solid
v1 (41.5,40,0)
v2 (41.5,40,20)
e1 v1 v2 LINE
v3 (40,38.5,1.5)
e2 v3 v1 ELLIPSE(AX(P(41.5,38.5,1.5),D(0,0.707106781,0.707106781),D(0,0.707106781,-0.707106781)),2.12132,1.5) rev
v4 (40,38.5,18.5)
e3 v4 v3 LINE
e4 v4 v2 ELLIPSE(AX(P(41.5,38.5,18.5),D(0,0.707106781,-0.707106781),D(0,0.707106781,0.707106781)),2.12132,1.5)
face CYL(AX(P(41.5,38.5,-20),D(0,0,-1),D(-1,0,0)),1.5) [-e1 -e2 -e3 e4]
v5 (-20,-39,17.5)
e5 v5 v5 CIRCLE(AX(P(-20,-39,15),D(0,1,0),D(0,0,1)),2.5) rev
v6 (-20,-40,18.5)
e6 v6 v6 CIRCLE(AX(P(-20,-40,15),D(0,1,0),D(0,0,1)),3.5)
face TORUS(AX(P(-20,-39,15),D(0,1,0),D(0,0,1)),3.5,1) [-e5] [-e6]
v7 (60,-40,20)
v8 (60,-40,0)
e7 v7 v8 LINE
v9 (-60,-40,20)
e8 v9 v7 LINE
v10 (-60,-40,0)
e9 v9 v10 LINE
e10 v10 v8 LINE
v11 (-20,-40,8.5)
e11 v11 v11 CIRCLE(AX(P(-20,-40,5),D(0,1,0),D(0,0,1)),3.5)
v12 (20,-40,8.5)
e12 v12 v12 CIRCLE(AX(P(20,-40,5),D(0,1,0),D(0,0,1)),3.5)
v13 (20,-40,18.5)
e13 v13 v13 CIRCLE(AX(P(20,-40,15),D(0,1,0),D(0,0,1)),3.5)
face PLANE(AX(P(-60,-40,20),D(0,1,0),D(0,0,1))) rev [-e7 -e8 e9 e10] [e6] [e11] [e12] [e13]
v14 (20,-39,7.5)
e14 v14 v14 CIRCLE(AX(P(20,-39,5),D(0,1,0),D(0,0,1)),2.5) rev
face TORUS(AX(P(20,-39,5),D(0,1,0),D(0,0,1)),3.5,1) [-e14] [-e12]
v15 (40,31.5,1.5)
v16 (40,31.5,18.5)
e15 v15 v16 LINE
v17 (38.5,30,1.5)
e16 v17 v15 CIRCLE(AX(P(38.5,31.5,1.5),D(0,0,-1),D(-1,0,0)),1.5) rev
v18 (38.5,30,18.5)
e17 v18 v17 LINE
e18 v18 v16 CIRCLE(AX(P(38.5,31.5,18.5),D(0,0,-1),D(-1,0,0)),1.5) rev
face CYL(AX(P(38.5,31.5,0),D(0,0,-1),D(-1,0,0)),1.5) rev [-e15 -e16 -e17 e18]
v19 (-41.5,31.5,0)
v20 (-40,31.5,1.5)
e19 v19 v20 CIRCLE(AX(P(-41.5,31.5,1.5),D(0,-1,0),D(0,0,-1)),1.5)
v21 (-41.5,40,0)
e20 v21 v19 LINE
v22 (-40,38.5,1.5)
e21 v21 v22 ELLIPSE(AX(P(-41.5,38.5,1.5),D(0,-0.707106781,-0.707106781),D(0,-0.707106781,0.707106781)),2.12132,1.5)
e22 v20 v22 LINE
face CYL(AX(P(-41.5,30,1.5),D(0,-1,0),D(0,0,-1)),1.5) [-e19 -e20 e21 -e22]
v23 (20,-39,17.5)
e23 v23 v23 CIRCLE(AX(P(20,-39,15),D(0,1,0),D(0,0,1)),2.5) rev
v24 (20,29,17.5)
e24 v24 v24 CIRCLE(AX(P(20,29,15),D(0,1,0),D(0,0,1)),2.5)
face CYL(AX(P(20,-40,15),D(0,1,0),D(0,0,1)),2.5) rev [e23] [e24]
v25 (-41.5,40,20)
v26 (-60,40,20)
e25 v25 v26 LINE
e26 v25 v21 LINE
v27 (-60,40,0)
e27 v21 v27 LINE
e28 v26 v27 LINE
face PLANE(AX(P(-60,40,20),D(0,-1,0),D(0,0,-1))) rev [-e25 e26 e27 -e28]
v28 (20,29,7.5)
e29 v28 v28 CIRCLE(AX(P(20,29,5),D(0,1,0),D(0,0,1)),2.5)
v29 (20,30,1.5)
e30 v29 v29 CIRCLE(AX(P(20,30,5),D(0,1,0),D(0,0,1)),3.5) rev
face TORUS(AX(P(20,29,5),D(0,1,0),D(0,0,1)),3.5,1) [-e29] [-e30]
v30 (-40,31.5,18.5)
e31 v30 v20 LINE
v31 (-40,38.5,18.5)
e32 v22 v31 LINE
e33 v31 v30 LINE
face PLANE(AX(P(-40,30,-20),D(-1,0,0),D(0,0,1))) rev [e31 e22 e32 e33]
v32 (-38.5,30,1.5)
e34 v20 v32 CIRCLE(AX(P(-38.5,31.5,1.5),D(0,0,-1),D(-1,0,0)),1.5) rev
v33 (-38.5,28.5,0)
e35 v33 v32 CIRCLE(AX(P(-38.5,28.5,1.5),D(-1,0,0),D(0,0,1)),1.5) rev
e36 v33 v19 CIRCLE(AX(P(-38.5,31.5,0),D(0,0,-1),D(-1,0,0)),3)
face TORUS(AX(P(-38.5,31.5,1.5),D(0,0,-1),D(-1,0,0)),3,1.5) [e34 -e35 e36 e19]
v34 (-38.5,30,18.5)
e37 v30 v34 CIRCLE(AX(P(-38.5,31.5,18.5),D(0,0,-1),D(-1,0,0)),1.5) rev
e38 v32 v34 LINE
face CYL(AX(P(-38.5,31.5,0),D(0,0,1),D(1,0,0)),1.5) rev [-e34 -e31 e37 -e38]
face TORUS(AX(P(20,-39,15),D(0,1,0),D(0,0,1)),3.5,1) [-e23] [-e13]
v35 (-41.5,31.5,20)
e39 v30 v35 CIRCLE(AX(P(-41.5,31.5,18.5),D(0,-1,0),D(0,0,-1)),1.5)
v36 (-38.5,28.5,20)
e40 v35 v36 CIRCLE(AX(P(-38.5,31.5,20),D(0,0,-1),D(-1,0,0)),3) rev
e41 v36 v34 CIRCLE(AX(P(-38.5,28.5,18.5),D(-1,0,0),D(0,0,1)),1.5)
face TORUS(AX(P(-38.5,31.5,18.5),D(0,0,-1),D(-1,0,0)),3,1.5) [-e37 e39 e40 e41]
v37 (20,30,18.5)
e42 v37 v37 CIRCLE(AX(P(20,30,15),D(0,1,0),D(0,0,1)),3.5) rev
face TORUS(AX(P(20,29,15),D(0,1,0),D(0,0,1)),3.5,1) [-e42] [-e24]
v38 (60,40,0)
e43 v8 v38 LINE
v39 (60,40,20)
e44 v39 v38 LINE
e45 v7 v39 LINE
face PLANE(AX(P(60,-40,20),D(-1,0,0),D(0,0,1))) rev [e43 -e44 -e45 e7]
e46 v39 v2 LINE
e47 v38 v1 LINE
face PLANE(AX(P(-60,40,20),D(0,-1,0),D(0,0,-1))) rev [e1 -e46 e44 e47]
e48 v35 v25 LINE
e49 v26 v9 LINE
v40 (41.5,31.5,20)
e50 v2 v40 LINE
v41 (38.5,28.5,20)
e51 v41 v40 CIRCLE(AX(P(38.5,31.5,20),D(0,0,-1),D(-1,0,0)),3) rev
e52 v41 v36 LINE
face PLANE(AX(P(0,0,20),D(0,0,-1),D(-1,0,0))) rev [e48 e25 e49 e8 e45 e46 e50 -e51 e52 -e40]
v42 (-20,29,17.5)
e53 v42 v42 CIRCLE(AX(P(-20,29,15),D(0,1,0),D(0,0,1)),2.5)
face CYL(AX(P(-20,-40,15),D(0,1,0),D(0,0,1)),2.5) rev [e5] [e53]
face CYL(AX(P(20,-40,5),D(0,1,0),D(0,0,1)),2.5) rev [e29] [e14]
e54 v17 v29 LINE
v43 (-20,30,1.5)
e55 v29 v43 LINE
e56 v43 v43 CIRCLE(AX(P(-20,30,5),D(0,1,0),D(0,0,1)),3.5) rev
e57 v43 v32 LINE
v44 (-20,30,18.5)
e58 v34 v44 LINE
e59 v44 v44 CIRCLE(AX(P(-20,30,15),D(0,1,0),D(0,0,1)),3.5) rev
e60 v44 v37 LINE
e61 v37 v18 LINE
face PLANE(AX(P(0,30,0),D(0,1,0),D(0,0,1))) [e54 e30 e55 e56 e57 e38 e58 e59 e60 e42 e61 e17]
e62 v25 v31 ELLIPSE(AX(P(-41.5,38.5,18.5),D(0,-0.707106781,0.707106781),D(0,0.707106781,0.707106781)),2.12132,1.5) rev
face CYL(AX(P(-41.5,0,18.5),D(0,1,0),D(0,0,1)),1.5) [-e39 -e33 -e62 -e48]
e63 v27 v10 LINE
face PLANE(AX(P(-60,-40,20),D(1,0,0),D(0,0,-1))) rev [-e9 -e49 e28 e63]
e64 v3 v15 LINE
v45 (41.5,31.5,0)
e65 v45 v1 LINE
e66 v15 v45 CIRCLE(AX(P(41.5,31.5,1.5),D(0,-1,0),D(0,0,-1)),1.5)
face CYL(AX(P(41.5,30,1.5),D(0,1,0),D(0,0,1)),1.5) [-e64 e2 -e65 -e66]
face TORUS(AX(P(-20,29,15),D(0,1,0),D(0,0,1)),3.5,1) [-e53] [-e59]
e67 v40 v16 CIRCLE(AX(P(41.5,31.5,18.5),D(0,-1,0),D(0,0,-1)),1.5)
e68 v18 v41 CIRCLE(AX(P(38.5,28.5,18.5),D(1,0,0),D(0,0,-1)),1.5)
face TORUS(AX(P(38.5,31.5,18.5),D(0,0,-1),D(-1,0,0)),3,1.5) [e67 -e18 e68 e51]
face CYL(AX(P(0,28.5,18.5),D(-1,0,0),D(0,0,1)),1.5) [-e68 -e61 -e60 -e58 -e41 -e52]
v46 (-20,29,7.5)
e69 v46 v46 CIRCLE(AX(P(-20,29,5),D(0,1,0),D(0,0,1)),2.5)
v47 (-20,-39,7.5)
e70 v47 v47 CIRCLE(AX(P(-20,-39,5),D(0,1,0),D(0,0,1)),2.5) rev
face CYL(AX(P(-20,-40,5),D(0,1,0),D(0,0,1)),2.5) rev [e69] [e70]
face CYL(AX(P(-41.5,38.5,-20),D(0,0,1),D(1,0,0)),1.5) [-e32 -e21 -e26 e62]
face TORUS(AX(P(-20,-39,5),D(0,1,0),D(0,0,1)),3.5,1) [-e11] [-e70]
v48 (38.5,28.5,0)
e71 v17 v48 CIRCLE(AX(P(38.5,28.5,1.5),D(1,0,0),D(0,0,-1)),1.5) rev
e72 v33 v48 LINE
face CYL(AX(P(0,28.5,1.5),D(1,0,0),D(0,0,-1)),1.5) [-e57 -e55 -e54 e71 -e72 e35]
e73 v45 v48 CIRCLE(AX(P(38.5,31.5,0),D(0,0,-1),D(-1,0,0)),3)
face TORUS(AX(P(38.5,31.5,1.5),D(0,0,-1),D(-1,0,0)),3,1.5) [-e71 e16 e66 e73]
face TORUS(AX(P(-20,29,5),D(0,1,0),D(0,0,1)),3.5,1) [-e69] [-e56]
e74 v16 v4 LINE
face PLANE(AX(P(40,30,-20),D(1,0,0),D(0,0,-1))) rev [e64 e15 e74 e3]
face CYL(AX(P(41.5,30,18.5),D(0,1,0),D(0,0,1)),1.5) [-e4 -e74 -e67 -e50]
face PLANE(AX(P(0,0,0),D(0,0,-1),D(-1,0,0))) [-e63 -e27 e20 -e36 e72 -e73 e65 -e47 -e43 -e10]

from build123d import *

# Parameters (mm, degrees)
SKETCH2_W           = 120
SKETCH2_H           = 80
BOSS_EXTRUDE1_DEPTH = 20
SKETCH3_W           = 80
SKETCH3_H           = 40
CUT_EXTRUDE1_DEPTH  = 10
SKETCH5_R           = 2.5
CUT_EXTRUDE3_DEPTH  = 95.339811321
FILLET5_R           = 1
FILLET6_R           = 1.5


with BuildPart() as part:
    # Sketch2 → Boss-Extrude1 (new body)
    with BuildSketch(Plane.XY):
        Rectangle(SKETCH2_W, SKETCH2_H)
    extrude(amount=BOSS_EXTRUDE1_DEPTH)

    # Sketch3 → Cut-Extrude1 (cut)
    with BuildSketch(Plane(origin=(0, 40, 0), x_dir=(1, 0, 0), z_dir=(0, 1, 0))):
        Rectangle(SKETCH3_W, SKETCH3_H)
    extrude(amount=-CUT_EXTRUDE1_DEPTH, mode=Mode.SUBTRACT)

    # Sketch5 → Cut-Extrude3 (cut, through all)
    with BuildSketch(Plane(origin=(0, 30, 0), x_dir=(1, 0, 0), z_dir=(0, 1, 0))):
        with Locations(Location((-20, -5, 0), (0, 0, 270))):
            Circle(SKETCH5_R)
        with Locations(Location((-20, -15, 0), (0, 0, 270))):
            Circle(SKETCH5_R)
        with Locations(Location((20, -5, 0), (0, 0, 270))):
            Circle(SKETCH5_R)
        with Locations(Location((20, -15, 0), (0, 0, 270))):
            Circle(SKETCH5_R)
    extrude(amount=-CUT_EXTRUDE3_DEPTH, mode=Mode.SUBTRACT)

    # Fillet5
    fillet5_edges = [part.edges().sort_by_distance(p)[0] for p in [
        (-20, -40, 12.5),
        (-20, 30, 12.5),
        (20, -40, 2.5),
        (20, 30, 2.5),
        (20, -40, 12.5),
        (20, 30, 12.5),
        (-20, -40, 2.5),
        (-20, 30, 2.5),
    ]]
    fillet(fillet5_edges, radius=FILLET5_R)

    # Fillet6
    fillet6_edges = [part.edges().sort_by_distance(p)[0] for p in [
        (0, 30, 0),
        (-40, 35, 0),
        (40, 35, 0),
        (40, 30, 10),
        (0, 30, 20),
        (40, 35, 20),
        (-40, 30, 10),
        (-40, 35, 20),
        (-40, 40, 10),
        (40, 40, 10),
    ]]
    fillet(fillet6_edges, radius=FILLET6_R - 0.0001)  # a hair under: the kernel refuses the full size


solid = part.part
